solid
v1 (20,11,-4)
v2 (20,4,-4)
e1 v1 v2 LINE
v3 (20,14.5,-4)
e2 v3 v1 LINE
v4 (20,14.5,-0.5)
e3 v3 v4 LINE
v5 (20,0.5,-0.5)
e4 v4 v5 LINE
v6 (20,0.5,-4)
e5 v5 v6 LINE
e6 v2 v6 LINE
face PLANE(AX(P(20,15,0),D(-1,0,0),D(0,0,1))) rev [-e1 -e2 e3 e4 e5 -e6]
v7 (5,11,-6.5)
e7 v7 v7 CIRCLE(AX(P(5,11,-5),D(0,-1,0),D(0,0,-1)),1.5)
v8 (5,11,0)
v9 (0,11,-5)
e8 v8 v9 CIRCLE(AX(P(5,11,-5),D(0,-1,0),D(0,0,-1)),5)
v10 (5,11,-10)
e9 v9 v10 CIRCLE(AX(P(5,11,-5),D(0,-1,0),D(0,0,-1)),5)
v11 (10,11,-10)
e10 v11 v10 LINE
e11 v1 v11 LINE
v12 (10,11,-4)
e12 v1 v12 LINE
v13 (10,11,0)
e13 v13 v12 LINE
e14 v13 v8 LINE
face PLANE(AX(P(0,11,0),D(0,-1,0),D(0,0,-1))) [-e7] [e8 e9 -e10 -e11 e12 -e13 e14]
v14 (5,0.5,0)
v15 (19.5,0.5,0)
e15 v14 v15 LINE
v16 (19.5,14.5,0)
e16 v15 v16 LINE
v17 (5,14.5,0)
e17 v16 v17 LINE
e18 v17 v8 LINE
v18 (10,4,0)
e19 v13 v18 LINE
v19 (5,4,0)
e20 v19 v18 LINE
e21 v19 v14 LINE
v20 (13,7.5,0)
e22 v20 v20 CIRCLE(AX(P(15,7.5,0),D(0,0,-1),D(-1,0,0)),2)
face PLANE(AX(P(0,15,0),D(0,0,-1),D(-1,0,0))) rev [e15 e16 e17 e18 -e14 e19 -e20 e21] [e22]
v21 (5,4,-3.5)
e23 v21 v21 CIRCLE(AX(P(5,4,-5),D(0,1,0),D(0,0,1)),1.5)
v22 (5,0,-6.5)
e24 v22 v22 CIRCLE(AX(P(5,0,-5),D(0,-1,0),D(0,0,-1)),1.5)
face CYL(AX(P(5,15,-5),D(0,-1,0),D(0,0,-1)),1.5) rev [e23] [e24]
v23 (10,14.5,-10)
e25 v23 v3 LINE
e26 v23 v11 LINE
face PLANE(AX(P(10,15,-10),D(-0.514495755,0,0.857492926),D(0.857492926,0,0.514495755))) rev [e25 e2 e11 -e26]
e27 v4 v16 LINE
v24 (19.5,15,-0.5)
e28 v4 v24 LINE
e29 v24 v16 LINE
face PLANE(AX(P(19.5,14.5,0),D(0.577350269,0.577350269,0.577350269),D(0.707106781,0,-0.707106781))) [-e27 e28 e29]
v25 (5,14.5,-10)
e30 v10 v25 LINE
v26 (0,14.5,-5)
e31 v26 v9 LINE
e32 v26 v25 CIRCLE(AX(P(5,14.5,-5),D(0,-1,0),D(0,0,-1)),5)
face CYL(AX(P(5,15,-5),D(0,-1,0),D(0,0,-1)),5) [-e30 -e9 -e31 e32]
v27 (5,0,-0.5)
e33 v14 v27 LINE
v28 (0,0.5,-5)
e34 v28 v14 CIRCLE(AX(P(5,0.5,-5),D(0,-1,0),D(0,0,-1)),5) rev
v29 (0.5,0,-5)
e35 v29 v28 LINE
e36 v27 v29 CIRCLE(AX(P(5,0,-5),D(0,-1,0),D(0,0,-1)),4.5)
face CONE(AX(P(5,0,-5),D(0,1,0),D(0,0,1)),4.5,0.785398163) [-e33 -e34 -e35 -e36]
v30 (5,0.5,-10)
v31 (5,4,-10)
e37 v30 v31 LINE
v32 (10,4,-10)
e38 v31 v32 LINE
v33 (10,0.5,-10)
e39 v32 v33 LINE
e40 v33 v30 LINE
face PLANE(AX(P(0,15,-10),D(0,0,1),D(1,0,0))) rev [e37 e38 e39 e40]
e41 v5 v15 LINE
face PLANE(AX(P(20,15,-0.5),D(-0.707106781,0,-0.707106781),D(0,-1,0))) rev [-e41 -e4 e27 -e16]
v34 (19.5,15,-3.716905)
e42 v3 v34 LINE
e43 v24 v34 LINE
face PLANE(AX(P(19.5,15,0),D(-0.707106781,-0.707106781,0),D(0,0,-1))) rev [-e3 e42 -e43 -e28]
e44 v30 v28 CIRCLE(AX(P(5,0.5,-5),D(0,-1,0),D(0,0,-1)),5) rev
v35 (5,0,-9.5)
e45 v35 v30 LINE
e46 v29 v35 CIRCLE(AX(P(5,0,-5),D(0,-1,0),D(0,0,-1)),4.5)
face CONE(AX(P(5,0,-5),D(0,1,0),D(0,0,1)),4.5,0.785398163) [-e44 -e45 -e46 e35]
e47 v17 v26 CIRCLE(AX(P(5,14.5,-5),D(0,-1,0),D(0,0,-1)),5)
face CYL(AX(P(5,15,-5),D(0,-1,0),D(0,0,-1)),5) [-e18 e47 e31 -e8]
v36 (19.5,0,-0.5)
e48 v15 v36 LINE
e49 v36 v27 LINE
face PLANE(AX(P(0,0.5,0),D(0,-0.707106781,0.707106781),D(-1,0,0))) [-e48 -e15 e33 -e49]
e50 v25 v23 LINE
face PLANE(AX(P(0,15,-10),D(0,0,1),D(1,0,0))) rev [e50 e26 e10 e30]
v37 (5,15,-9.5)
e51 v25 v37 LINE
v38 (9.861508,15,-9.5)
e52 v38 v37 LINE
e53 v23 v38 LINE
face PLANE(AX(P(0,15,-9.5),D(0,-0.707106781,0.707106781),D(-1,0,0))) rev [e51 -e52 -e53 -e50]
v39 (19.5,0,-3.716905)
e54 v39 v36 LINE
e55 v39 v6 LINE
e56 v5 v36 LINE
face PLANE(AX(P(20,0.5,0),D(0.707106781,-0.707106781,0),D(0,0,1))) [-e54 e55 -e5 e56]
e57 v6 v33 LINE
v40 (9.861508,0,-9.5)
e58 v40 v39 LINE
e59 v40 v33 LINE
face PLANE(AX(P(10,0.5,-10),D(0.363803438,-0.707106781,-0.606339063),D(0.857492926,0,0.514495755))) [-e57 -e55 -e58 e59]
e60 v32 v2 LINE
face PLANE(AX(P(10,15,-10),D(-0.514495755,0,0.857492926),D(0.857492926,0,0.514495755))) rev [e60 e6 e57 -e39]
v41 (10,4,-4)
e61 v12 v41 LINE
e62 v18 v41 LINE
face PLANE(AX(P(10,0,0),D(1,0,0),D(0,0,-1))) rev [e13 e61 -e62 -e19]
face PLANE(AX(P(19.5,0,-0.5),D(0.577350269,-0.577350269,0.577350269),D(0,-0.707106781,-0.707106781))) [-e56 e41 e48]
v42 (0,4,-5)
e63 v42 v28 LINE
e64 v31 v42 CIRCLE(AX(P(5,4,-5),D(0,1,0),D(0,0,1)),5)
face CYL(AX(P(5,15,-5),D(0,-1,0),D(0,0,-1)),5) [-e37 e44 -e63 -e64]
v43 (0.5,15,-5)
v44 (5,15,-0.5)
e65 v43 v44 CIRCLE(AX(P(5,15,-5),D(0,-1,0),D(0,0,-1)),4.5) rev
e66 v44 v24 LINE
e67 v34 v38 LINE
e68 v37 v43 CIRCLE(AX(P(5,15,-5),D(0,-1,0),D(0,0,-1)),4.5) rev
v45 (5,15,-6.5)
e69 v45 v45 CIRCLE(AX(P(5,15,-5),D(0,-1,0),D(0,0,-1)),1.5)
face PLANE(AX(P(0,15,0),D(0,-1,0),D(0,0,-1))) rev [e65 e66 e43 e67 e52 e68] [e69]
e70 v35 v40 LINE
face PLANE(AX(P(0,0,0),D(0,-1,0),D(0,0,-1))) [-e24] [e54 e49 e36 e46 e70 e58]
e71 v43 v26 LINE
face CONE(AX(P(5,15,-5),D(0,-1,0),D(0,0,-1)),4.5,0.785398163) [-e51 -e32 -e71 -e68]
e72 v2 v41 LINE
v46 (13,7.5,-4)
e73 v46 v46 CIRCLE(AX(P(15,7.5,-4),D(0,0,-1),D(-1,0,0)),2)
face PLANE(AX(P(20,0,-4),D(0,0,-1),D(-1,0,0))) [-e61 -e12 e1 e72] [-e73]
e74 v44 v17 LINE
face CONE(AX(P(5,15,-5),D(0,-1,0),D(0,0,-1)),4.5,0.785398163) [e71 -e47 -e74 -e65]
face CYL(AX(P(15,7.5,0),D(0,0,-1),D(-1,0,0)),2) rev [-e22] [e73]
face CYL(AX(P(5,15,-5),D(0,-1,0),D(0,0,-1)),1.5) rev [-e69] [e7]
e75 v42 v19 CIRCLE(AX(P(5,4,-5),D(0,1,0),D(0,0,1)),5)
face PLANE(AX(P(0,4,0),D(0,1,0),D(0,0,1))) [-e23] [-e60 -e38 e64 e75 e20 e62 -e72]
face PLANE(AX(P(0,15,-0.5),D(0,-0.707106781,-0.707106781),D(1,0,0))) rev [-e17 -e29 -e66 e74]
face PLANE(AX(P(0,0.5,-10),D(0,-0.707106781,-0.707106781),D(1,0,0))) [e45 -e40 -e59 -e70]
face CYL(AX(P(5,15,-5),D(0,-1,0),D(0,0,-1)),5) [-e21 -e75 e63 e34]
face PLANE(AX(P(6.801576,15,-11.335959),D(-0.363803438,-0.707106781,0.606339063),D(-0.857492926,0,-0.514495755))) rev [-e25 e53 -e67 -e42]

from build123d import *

# Parameters (mm, degrees)
EXTRUDE_1_DEPTH     = 15
SKETCH_2_W          = 10
SKETCH_2_H          = 7
CUT_EXTRUDE_1_DEPTH = 27.925824036
SKETCH_3_W          = 6
SKETCH_3_H          = 7
CUT_EXTRUDE_2_DEPTH = 21.615528128
SKETCH_4_R          = 2
CUT_EXTRUDE_3_DEPTH = 26.709920264
FILLET_1_R          = 5
SKETCH_5_R          = 1.5
CUT_EXTRUDE_4_DEPTH = 27.925824036
CHAMFER_1_SIZE      = 0.5


with BuildPart() as part:
    # ｽｹｯﾁ1 → ﾎﾞｽ - 押し出し1 (new body)
    with BuildSketch(Plane(origin=(0, 0, 0), x_dir=(1, 0, 0), z_dir=(0, 1, 0))):
        Polygon((0, 0), (20, 0), (20, 4), (10, 10), (0, 10), align=None)
    extrude(amount=EXTRUDE_1_DEPTH)

    # ｽｹｯﾁ2 → ｶｯﾄ - 押し出し1 (cut, through all)
    with BuildSketch(Plane(origin=(0, 0, -10), x_dir=(-1, 0, 0), z_dir=(0, 0, -1))):
        with Locations((-5, 7.5)):
            Rectangle(SKETCH_2_W, SKETCH_2_H)
    extrude(amount=-CUT_EXTRUDE_1_DEPTH, mode=Mode.SUBTRACT)

    # ｽｹｯﾁ3 → ｶｯﾄ - 押し出し2 (cut, through all)
    with BuildSketch(Plane.ZY.offset(-10)):
        with Locations((-7, 7.5)):
            Rectangle(SKETCH_3_W, SKETCH_3_H)
    extrude(amount=-CUT_EXTRUDE_2_DEPTH, mode=Mode.SUBTRACT)

    # ｽｹｯﾁ4 → ｶｯﾄ - 押し出し3 (cut, through all)
    with BuildSketch(Plane(origin=(0, 0, -4), x_dir=(-1, 0, 0), z_dir=(0, 0, -1))):
        with Locations((-15, 7.5)):
            Circle(SKETCH_4_R)
    extrude(amount=-CUT_EXTRUDE_3_DEPTH, mode=Mode.SUBTRACT)

    # ﾌｨﾚｯﾄ1
    fillet_1_edges = [part.edges().sort_by_distance(p)[0] for p in [
        (0, 2, 0),
        (0, 2, -10),
        (0, 13, 0),
        (0, 13, -10),
    ]]
    fillet(fillet_1_edges, radius=FILLET_1_R - 0.0001)  # a hair under: the kernel refuses the full size

    # ｽｹｯﾁ5 → ｶｯﾄ - 押し出し4 (cut, through all)
    with BuildSketch(Plane.XZ):
        with Locations(Location((5, -5, 0), (0, 0, 270))):
            Circle(SKETCH_5_R)
    extrude(amount=-CUT_EXTRUDE_4_DEPTH, mode=Mode.SUBTRACT)

    # 面取り1
    chamfer_1_edges = [part.edges().sort_by_distance(p)[0] for p in [
        (20, 15, -2),
        (15, 15, -7),
        (7.49995, 15, -10),
        (7.49995, 0, -10),
        (12.49995, 0, 0),
        (12.49995, 15, 0),
        (15, 0, -7),
        (1.464436805, 0, -8.535563195),
        (1.464436805, 0, -1.464436805),
        (20, 0, -2),
        (1.464436805, 15, -8.535563195),
        (1.464436805, 15, -1.464436805),
        (20, 7.5, 0),
    ]]
    chamfer(chamfer_1_edges, length=CHAMFER_1_SIZE)


solid = part.part
